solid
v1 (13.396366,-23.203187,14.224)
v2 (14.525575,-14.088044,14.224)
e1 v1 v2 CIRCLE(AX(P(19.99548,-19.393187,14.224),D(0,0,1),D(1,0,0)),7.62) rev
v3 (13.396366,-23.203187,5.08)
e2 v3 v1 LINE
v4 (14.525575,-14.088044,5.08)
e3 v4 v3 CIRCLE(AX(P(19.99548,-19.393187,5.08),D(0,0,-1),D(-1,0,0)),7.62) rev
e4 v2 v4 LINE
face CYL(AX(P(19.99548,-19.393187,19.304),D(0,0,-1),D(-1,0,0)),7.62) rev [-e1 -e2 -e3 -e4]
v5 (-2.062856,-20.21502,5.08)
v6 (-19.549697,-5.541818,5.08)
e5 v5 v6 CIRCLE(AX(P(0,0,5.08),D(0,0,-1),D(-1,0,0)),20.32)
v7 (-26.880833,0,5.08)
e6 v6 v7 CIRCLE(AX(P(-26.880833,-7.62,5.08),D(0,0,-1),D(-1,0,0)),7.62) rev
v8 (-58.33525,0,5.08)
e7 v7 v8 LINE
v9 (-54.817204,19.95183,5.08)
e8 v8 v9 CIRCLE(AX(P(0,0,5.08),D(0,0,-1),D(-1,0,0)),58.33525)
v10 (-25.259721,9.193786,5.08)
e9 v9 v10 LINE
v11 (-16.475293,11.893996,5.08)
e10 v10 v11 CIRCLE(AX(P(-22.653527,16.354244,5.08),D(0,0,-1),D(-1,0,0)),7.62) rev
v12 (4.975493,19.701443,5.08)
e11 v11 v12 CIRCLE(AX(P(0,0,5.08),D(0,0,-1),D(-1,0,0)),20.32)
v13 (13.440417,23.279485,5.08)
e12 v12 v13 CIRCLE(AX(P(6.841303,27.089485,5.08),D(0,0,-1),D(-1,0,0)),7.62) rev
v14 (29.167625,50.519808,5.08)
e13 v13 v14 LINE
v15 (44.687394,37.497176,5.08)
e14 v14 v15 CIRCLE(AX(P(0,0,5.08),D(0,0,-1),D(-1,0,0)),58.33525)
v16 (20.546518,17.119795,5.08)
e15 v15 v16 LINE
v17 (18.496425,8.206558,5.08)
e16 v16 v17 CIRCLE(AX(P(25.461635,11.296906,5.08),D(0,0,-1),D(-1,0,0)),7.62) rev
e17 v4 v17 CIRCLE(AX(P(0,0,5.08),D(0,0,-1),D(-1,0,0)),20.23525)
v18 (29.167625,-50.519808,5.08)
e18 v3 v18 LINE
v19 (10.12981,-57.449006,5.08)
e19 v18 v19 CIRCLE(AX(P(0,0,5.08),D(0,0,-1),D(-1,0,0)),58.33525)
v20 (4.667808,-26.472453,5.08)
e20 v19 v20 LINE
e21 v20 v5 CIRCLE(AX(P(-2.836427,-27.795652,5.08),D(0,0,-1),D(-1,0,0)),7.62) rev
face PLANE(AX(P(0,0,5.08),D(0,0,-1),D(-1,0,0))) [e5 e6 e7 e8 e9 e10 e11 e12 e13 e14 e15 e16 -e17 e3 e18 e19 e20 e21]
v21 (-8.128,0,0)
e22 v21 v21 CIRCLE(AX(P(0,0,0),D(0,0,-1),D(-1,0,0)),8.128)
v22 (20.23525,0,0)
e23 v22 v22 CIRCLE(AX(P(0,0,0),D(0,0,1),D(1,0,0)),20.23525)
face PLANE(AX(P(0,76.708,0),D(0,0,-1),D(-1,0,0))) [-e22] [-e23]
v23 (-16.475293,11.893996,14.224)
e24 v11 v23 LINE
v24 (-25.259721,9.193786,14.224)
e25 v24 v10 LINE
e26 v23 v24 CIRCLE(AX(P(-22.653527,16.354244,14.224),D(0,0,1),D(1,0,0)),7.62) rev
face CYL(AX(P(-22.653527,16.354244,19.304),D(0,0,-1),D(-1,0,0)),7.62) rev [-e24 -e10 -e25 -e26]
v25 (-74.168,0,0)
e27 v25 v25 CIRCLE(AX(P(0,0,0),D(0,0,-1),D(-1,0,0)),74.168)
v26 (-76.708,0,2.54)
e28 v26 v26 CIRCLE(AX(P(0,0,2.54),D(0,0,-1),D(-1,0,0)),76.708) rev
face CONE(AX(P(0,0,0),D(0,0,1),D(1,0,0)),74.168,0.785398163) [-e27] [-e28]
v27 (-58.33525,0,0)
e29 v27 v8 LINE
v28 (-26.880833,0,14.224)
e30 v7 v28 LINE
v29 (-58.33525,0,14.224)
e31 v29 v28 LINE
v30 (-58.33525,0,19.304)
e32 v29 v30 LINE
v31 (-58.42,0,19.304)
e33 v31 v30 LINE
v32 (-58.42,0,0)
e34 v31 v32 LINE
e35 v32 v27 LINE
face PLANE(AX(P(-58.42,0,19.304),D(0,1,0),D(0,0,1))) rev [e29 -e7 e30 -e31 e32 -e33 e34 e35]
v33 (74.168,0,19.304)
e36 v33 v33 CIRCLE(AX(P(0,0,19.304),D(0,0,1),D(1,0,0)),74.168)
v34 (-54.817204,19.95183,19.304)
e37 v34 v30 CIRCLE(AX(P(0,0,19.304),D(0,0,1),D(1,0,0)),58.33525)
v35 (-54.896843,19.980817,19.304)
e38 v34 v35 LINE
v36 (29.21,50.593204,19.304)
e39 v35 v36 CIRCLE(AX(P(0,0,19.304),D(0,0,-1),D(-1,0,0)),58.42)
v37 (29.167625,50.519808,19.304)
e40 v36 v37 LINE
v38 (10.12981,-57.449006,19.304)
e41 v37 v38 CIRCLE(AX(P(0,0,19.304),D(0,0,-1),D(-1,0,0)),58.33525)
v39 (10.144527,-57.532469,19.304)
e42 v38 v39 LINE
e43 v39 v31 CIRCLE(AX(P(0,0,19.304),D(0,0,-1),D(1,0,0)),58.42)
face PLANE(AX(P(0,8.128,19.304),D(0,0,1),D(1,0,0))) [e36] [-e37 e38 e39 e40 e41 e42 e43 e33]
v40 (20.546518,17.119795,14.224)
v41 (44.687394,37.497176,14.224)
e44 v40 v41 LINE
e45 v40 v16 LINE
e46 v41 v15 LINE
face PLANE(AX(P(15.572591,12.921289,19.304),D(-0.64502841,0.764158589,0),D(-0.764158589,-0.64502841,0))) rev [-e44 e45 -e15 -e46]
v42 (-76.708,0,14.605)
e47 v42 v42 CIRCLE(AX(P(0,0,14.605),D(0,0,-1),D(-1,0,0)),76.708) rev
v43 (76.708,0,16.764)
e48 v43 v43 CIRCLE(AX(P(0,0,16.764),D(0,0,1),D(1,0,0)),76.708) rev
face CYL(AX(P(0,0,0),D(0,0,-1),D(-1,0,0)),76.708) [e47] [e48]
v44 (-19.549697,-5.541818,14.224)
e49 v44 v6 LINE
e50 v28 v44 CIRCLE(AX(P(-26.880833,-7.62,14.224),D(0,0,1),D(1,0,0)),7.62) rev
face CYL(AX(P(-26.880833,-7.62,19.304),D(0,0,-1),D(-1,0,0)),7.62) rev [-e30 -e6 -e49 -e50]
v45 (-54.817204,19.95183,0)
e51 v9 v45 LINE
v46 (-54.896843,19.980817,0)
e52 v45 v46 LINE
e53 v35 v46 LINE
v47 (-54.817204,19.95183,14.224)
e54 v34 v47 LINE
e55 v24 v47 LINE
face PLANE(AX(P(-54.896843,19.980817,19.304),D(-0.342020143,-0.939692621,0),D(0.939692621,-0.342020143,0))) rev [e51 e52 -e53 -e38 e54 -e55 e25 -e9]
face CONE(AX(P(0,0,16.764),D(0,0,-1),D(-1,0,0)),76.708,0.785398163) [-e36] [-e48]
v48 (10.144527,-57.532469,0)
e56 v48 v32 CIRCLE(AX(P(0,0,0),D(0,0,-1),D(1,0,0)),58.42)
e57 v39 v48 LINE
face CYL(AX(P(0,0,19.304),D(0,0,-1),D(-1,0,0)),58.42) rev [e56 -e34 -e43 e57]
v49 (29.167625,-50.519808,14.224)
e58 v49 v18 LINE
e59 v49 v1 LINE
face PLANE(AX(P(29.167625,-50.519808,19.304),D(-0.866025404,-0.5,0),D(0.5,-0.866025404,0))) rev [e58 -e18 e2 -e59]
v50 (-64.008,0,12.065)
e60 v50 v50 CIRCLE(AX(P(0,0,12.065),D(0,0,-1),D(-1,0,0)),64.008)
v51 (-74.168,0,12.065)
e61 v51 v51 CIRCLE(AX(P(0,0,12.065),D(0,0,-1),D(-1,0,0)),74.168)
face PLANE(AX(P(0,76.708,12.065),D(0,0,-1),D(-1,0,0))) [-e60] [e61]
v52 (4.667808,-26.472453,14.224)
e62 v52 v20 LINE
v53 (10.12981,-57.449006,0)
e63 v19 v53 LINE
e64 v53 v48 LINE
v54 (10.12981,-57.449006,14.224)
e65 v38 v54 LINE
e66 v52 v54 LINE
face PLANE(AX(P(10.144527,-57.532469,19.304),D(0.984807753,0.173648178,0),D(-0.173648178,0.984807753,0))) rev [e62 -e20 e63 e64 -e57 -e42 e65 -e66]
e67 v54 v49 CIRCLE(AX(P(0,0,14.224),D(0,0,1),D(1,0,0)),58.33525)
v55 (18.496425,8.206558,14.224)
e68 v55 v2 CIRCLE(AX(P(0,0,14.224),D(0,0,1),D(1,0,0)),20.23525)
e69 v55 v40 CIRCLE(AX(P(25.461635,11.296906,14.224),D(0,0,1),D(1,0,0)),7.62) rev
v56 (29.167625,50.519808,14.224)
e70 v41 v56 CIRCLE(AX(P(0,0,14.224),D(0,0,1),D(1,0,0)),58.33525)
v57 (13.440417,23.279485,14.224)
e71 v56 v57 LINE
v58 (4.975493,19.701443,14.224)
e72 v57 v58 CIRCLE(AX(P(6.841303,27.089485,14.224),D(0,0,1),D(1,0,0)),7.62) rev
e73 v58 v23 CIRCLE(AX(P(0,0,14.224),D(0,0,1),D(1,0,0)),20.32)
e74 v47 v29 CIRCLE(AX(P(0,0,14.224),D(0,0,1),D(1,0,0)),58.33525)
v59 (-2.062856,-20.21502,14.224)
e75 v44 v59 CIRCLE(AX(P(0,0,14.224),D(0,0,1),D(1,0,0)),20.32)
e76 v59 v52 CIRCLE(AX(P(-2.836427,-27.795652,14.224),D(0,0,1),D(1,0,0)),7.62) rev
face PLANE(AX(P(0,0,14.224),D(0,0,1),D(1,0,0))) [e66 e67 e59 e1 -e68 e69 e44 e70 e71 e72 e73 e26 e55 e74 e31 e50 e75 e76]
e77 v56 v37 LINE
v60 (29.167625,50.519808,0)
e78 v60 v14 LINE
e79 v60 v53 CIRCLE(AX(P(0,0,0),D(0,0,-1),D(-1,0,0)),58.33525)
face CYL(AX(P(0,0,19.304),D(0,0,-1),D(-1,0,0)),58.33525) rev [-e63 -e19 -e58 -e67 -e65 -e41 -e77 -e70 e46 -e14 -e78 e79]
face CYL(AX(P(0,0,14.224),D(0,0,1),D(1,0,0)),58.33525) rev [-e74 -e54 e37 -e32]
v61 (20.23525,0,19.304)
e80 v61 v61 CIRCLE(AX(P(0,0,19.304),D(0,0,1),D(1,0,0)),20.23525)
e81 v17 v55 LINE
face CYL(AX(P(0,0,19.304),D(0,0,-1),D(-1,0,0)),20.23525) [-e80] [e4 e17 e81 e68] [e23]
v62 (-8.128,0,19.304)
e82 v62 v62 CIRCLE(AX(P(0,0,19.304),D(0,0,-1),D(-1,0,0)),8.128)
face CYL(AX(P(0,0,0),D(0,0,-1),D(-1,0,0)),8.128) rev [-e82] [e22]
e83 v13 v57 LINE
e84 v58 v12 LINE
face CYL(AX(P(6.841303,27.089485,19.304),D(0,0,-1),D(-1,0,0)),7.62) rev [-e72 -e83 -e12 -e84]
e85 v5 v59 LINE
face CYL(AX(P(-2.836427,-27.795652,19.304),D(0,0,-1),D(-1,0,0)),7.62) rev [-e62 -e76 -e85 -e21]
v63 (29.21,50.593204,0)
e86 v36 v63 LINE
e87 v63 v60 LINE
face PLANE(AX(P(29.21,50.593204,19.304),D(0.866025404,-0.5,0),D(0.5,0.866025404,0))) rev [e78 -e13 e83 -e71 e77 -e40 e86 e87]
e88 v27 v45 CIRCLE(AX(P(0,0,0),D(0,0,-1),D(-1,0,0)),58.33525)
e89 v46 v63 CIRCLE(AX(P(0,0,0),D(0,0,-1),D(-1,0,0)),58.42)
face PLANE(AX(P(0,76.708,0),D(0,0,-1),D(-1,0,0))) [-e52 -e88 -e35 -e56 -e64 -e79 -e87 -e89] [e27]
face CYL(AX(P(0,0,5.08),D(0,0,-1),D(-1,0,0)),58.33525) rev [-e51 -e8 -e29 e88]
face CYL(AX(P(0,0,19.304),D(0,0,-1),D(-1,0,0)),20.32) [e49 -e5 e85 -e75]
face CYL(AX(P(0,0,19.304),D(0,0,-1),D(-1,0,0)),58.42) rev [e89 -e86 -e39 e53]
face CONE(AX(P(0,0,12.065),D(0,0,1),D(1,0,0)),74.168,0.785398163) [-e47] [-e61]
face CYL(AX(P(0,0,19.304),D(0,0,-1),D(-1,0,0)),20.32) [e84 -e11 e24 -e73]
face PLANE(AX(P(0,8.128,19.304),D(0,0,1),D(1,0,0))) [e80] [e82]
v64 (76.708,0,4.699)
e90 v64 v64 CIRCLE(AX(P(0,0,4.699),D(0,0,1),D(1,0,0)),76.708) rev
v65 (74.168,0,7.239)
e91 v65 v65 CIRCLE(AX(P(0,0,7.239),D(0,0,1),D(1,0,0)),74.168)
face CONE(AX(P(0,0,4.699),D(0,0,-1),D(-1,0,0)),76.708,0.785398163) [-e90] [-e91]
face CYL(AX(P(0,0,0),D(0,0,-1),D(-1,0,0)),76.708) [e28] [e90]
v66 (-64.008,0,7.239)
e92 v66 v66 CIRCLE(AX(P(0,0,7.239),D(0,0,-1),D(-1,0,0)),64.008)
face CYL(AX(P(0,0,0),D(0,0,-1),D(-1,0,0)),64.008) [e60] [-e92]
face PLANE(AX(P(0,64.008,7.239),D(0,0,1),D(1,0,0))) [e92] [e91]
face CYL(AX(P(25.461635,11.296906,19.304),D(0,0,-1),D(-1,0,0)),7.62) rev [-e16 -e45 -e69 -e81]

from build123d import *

# Parameters (mm, degrees)
CHAMFER1_SIZE      = 2.54
CUT_EXTRUDE1_DEPTH = 111.185656707
SKETCH6_R          = 58.335249529
SKETCH6_R_2        = 20.235249529
CUT_EXTRUDE2_DEPTH = 5.08
CUT_EXTRUDE3_START = -5.08
SKETCH7_R          = 58.335249529
SKETCH7_R_2        = 20.235249529
CUT_EXTRUDE3_DEPTH = 5.08
FILLET15_R         = 7.62


with BuildPart() as part:
    # Sketch2 → Revolve1 (revolve)
    with BuildSketch(Plane.YZ, mode=Mode.PRIVATE) as revolve1_sk:
        Polygon((8.128, 0), (8.128, 19.304), (76.708, 19.304), (76.708, 12.065), (64.008, 12.065), (64.008, 7.239), (76.708, 7.239), (76.708, 0), align=None)
    revolve(revolve1_sk.sketch.rotate(Axis((0, 0, 0), (0, 0, 1)), 90), axis=Axis((0, 0, 0), (0, 0, 1)))

    # Chamfer1
    chamfer1_edges = [part.edges().sort_by_distance(p)[0] for p in [
        (76.708, 0, 0),
        (76.708, 0, 7.239),
        (76.708, 0, 12.065),
        (76.708, 0, 19.304),
    ]]
    chamfer(chamfer1_edges, length=CHAMFER1_SIZE)

    # Sketch5 → Cut-Extrude1 (cut, through all)
    with BuildSketch(Plane(origin=(0, 0, 0), x_dir=(1, 0, 0), z_dir=(0, 0, -1))):
        with BuildLine():
            Line((-58.42, 0), (-20.32, 0))
            ThreePointArc((-20.32, 0), (-13.061444229, 15.566023084), (3.52853097, 20.011293541))
            Line((3.52853097, 20.011293541), (10.144526539, 57.532468931))
            ThreePointArc((10.144526539, 57.532468931), (-37.551652158, 44.752316367), (-58.42, 0))
        make_face()
        with BuildLine():
            Line((29.21, -50.593204089), (10.16, -17.597636205))
            ThreePointArc((10.16, -17.597636205), (-6.949849312, -19.094554054), (-19.094554054, -6.949849312))
            Line((-19.094554054, -6.949849312), (-54.896842906, -19.980816773))
            ThreePointArc((-54.896842906, -19.980816773), (-19.980816773, -54.896842906), (29.21, -50.593204089))
        make_face()
        with BuildLine():
            Line((15.5725915, -12.921289312), (44.68739374, -37.497175605))
            ThreePointArc((44.68739374, -37.497175605), (57.44900601, 10.129809775), (29.167624765, 50.519808029))
            Line((29.167624765, 50.519808029), (10.117624765, 17.524240144))
            ThreePointArc((10.117624765, 17.524240144), (19.918066395, 3.568746925), (15.5725915, -12.921289312))
        make_face()
    extrude(amount=-CUT_EXTRUDE1_DEPTH, mode=Mode.SUBTRACT)

    # Sketch6 → Cut-Extrude2 (cut)
    with BuildSketch(Plane(origin=(0, 0, 0), x_dir=(1, 0, 0), z_dir=(0, 0, -1))):
        Circle(SKETCH6_R)
        with Locations(Location((0, 0, 0), (0, 0, 60))):
            Circle(SKETCH6_R_2, mode=Mode.SUBTRACT)
    extrude(amount=-CUT_EXTRUDE2_DEPTH, mode=Mode.SUBTRACT)

    # Sketch7 → Cut-Extrude3 (cut)
    with BuildSketch(Plane(origin=(0, 0, 19.304), x_dir=(0, -1, 0), z_dir=(0, 0, 1)).offset(CUT_EXTRUDE3_START)):
        Circle(SKETCH7_R)
        with Locations(Location((0, 0, 0), (0, 0, 90))):
            Circle(SKETCH7_R_2, mode=Mode.SUBTRACT)
    extrude(amount=CUT_EXTRUDE3_DEPTH, mode=Mode.SUBTRACT)

    # Fillet15
    # the kernel refuses this fillet: 7.62 mm, written as the material it adds along each edge
    with BuildSketch(Plane(origin=(10.16, 17.597636205, 5.08), x_dir=(-0.9266160044504649, 0.3760090162433024, 0), z_dir=(0, 0, 1)), Plane(origin=(-20.32, 0, 5.08), x_dir=(0.13767464210654276, -0.9904775075289874, 0), z_dir=(0, 0, 1))) as fillet15_piece_1:
        with BuildLine():
            CenterArc((6.644178228, -7.547438607), FILLET15_R, 97.913310066, 74.173379868)
            Line((-0.903260379, -6.498357835), (0, 0))
            ThreePointArc((0, 0), (2.797548728, -0.193497047), (5.595097455, 0))
        make_face()
    extrude(amount=9.144)
    with BuildSketch(Plane(origin=(-19.094554054, 6.949849312, 5.08), x_dir=(0.4681351043427711, 0.8836569040538205, 0), z_dir=(0, 0, 1)), Plane(origin=(3.52853097, -20.011293541, 5.08), x_dir=(-0.9993368793115024, -0.03641155926279142, 0), z_dir=(0, 0, 1))) as fillet15_piece_2:
        with BuildLine():
            CenterArc((6.644178228, 7.547438607), FILLET15_R, 187.913310066, 74.173379868)
            Line((-0.903260379, 6.498357835), (0, 0))
            ThreePointArc((0, 0), (2.797548728, 0.193497047), (5.595097455, 0))
        make_face()
    extrude(amount=9.144)
    with BuildSketch(Plane(origin=(15.5725915, 12.921289312, 5.08), x_dir=(0.5270307863696181, -0.8498461920951471, 0), z_dir=(0, 0, 1))) as fillet15_piece_3:
        with BuildLine():
            CenterArc((6.592305904, 7.548065724), FILLET15_R, 188.362749939, 73.758264082)
            Line((-0.946671381, 6.439814174), (0, 0))
            ThreePointArc((0, 0), (2.773873375, 0.191024675), (5.54774675, 0))
        make_face()
    extrude(amount=9.144)
    with BuildSketch(Plane(origin=(10.117624765, -17.524240144, 5.08), x_dir=(0.5000000000000031, -0.8660254037844368, 0), z_dir=(0, 0, 1))) as fillet15_piece_4:
        with BuildLine():
            CenterArc((6.557483186, 7.62), FILLET15_R, 195.876042448, 74.123957552)
            ThreePointArc((-0.771857845, 5.535495248), (-0.193893401, 2.794524654), (0, 0))
            Line((0, 0), (6.557483186, 0))
        make_face()
    extrude(amount=9.144)


solid = part.part
